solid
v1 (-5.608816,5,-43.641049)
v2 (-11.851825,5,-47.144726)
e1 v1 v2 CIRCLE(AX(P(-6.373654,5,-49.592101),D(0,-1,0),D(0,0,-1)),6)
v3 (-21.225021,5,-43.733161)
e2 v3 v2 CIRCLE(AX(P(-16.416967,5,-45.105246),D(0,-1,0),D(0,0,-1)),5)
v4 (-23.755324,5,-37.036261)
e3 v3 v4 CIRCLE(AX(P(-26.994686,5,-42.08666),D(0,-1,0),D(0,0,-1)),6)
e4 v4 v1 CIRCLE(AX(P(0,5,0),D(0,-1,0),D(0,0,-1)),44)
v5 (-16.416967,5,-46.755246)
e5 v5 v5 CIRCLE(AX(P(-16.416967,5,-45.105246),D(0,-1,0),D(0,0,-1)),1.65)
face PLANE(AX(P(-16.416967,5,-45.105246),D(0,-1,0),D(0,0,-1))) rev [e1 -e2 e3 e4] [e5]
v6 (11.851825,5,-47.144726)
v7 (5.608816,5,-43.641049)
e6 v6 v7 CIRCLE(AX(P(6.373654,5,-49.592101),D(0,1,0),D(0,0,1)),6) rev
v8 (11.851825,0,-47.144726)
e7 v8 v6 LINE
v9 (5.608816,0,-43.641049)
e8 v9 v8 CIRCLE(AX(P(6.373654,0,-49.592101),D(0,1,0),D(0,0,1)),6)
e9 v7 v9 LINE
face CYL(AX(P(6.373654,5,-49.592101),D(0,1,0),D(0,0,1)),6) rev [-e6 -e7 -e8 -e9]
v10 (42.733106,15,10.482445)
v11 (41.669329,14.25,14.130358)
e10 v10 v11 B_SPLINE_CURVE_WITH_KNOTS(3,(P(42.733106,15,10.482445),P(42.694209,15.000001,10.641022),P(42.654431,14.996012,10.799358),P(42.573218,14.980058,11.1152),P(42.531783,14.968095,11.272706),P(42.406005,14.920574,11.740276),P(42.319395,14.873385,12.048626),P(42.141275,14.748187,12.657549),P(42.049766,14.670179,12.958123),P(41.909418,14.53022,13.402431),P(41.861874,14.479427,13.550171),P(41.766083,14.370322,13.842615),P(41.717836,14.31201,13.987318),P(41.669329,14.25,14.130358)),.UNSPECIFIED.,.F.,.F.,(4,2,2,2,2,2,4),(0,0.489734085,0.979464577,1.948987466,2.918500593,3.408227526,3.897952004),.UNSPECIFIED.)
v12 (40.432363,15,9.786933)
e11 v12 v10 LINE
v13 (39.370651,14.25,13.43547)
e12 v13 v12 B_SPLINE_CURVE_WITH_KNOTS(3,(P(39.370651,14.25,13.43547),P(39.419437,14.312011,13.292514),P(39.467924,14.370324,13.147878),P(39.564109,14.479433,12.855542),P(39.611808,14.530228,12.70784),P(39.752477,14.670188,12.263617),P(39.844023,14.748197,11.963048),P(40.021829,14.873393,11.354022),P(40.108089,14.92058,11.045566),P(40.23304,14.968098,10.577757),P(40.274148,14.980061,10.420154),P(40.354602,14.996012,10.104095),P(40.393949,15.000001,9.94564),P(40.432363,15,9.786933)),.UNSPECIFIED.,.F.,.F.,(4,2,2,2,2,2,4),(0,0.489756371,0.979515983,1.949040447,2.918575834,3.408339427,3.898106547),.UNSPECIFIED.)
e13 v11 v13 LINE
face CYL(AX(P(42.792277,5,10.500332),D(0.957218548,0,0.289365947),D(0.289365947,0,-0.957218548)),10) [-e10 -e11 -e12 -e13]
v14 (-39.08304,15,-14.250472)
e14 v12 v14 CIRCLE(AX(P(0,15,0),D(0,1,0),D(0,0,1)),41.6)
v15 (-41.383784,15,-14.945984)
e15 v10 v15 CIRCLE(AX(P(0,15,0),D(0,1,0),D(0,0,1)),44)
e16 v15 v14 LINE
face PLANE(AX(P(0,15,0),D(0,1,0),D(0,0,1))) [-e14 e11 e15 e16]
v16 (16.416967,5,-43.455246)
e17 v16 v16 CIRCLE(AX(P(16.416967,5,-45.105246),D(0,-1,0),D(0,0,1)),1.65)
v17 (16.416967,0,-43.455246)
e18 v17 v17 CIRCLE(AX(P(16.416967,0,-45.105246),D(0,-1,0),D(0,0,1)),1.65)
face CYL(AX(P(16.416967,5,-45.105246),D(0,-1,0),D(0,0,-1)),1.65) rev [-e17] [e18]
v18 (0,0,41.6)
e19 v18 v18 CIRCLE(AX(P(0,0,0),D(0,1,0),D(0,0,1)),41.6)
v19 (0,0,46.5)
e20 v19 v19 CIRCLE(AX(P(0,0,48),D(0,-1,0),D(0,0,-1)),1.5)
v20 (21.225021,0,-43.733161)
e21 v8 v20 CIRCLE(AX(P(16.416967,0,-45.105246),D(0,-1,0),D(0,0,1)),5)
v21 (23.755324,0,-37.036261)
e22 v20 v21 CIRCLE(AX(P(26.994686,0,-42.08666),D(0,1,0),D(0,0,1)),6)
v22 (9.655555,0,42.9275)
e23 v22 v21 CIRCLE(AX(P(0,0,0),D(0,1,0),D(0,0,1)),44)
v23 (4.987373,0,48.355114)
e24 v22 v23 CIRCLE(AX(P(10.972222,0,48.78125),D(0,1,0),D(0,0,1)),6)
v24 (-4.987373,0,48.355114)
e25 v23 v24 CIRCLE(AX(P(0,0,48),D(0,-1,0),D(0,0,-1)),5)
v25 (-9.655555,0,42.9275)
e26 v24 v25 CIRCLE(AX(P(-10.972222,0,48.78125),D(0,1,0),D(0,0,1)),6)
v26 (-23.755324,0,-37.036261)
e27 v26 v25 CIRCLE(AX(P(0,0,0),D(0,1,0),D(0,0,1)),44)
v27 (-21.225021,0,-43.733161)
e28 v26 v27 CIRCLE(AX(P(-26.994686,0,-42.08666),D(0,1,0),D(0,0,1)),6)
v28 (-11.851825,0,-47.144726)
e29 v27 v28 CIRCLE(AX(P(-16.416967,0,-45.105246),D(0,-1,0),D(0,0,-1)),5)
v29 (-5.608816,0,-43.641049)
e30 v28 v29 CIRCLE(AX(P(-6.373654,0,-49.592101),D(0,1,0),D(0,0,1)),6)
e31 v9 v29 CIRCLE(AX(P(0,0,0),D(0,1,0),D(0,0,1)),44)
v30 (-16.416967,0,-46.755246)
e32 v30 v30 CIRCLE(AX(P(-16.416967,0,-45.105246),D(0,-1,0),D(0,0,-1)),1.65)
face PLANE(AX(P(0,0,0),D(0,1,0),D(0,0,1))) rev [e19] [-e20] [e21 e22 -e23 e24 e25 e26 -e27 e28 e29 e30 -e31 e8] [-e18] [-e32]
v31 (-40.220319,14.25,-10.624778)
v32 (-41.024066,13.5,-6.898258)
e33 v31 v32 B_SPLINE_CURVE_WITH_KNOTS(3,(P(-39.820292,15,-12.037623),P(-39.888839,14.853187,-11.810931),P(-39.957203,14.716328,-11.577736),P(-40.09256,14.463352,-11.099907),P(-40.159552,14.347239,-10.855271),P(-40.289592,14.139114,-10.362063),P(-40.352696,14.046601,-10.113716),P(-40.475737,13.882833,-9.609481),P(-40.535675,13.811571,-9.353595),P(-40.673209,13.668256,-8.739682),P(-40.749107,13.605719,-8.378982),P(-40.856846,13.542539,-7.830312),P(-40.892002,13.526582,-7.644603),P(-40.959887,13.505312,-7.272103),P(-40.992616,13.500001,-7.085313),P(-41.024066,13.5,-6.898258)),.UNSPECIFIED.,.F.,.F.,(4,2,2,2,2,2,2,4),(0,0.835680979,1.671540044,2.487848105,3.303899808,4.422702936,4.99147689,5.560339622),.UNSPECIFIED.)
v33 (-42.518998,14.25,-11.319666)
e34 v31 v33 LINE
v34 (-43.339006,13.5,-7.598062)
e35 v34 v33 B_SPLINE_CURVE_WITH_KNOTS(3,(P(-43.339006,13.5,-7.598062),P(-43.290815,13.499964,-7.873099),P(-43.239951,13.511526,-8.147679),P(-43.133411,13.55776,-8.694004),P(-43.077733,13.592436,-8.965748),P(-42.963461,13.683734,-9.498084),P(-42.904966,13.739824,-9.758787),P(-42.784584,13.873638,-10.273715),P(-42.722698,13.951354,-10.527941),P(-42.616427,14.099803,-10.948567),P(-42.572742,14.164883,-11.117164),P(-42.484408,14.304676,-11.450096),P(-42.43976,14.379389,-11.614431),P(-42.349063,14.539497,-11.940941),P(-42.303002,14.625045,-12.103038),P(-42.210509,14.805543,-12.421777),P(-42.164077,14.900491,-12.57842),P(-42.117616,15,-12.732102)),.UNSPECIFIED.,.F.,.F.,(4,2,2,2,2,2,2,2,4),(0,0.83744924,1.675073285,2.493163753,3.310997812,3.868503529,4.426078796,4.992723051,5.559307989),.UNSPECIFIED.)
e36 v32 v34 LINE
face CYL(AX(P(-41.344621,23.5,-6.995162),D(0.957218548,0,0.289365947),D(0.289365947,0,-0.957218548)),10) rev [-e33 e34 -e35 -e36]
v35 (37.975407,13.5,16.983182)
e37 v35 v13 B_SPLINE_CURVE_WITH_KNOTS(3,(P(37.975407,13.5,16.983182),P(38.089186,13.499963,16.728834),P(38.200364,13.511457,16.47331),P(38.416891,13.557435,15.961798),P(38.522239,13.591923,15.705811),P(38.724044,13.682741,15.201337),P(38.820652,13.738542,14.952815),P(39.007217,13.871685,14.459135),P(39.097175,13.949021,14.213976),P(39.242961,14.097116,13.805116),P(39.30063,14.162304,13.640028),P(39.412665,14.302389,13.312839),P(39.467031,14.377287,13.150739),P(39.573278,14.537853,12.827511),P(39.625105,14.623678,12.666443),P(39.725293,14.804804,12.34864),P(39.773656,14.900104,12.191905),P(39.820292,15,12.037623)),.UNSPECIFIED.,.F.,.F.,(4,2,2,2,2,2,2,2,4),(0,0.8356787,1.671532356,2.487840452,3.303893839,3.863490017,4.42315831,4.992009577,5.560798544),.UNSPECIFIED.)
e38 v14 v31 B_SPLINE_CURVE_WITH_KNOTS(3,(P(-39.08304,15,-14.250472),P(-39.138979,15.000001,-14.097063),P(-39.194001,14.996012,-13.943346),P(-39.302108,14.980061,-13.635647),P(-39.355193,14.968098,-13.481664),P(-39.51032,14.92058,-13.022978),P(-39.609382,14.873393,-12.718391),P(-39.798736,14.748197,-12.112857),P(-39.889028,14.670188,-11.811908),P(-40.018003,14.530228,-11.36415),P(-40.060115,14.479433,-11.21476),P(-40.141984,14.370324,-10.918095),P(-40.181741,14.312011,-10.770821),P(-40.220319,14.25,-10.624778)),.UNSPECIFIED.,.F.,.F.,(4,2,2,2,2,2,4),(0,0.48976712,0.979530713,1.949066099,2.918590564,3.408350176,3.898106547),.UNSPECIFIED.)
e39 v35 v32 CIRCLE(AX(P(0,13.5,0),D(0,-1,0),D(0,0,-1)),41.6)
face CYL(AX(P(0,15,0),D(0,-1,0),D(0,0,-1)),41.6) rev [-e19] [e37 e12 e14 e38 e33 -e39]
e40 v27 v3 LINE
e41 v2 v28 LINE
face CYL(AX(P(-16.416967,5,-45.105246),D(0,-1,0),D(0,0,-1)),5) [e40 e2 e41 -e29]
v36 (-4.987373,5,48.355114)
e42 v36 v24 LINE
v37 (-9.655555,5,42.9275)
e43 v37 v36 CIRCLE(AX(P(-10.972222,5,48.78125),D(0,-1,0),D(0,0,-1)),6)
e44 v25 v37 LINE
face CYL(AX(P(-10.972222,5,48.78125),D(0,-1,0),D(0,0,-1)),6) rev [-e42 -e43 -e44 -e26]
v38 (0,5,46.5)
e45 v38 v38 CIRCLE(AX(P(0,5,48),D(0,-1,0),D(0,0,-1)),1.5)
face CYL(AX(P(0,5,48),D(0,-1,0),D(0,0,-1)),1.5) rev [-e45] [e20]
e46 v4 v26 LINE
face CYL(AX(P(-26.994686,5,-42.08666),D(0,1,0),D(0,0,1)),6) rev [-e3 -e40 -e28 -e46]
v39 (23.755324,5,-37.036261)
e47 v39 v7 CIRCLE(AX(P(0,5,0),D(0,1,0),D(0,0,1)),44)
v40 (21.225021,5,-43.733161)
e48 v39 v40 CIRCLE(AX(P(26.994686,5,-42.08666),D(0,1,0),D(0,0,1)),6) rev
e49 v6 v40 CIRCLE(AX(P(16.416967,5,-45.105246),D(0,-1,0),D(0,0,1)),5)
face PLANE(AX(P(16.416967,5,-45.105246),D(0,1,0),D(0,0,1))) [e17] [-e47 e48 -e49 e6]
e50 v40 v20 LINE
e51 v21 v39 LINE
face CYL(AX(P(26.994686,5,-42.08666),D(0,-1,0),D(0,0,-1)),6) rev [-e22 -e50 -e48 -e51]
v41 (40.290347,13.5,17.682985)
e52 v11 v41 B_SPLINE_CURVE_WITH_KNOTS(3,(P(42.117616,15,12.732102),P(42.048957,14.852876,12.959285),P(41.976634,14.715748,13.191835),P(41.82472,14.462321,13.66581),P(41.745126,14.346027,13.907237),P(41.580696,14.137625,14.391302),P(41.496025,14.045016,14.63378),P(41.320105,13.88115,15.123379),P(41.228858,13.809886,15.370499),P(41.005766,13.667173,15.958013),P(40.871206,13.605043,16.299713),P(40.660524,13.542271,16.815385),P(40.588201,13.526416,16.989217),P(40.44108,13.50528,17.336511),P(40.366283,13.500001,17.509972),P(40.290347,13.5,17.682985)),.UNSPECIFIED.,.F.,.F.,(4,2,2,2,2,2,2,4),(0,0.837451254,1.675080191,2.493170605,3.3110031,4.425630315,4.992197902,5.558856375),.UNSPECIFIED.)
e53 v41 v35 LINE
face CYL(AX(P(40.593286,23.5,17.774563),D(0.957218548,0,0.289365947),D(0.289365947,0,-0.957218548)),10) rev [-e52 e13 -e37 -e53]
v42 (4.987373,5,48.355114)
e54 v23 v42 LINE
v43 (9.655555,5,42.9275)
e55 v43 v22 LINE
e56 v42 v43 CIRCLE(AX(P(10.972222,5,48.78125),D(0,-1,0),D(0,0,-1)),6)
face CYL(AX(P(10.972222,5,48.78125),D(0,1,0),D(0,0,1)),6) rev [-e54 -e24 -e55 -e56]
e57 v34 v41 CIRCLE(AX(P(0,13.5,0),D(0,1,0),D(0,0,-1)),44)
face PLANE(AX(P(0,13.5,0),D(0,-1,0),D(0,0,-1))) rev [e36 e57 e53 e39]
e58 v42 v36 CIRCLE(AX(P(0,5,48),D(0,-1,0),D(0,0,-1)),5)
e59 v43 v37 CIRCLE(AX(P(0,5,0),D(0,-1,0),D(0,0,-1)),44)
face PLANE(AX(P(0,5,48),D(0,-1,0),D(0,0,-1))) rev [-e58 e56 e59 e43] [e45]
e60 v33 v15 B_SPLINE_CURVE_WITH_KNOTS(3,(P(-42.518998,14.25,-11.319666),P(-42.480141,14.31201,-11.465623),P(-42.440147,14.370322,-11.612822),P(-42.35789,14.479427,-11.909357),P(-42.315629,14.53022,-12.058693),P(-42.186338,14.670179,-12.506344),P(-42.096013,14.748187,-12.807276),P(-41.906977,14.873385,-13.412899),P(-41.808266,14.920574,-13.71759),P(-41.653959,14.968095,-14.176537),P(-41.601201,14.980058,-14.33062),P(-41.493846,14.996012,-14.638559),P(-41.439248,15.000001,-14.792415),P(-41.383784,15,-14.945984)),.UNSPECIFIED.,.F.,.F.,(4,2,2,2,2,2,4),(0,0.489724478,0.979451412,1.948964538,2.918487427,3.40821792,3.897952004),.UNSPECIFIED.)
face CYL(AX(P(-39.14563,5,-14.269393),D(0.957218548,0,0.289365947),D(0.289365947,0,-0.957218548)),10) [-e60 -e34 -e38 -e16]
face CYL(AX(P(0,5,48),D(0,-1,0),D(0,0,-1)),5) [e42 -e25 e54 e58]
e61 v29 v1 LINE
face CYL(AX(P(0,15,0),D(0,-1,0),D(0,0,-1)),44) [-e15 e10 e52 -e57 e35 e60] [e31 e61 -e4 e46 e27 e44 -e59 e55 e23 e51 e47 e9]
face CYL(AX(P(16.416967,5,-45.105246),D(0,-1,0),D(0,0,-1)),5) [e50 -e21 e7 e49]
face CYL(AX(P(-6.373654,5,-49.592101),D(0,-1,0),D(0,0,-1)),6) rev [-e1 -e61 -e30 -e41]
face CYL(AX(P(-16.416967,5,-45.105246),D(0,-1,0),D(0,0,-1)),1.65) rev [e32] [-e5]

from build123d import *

# Parameters (mm, degrees)
SKETCH_1_R          = 44
SKETCH_1_R_2        = 41.6
EXTRUDE_1_DEPTH     = 15
SKETCH_2_R          = 5
SKETCH_2_R_2        = 1.5
SKETCH_2_R_3        = 1.65
EXTRUDE_2_DEPTH     = 5
FILLET_1_R          = 6
CUT_EXTRUDE_START   = -1.5
CUT_EXTRUDE_1_DEPTH = 1.5
FILLET_2_R          = 10
FILLET_START        = -45
FILLET_3_DEPTH      = 90


with BuildPart() as part:
    # 草图1 → 凸台-拉伸1 (new body)
    with BuildSketch(Plane(origin=(0, 0, 0), x_dir=(1, 0, 0), z_dir=(0, 1, 0))):
        with Locations(Location((0, 0, 0), (0, 0, 270))):
            Circle(SKETCH_1_R)
        with Locations(Location((0, 0, 0), (0, 0, 270))):
            Circle(SKETCH_1_R_2, mode=Mode.SUBTRACT)
    extrude(amount=EXTRUDE_1_DEPTH)

    # 草图2 → 凸台-拉伸2 (add)
    # profile 1 of 3: a face of its own
    with BuildSketch(Plane.XZ):
        with Locations((0, 48)):
            Circle(SKETCH_2_R)
        with Locations(Location((0, 48, 0), (0, 0, 270))):
            Circle(SKETCH_2_R_2, mode=Mode.SUBTRACT)
    # profile 2 of 3: a face of its own
    with BuildSketch(Plane.XZ):
        with Locations((-16.41696688, -45.105245798)):
            Circle(SKETCH_2_R)
        with Locations(Location((-16.41696688, -45.105245798, 0), (0, 0, 270))):
            Circle(SKETCH_2_R_3, mode=Mode.SUBTRACT)
    # profile 3 of 3: a face of its own
    with BuildSketch(Plane.XZ):
        with Locations((16.41696688, -45.105245798)):
            Circle(SKETCH_2_R)
        with Locations(Location((16.41696688, -45.105245798, 0), (0, 0, 90))):
            Circle(SKETCH_2_R_3, mode=Mode.SUBTRACT)
    extrude(amount=-EXTRUDE_2_DEPTH)

    # 圆角1
    fillet_1_edges = [part.edges().sort_by_distance(p)[0] for p in [
        (2.870750936, 2.5, 43.90625),
        (-2.870750936, 2.5, 43.90625),
        (-17.714445389, 2.5, -40.276524485),
        (-12.319198447, 2.5, -42.240233778),
        (12.319198447, 2.5, -42.240233778),
        (17.714445389, 2.5, -40.276524485),
    ]]
    fillet(fillet_1_edges, radius=FILLET_1_R)

    # 草图3 → 切除-拉伸1 (cut)
    with BuildSketch(Plane(origin=(0, 15, 0), x_dir=(1, 0, 0), z_dir=(0, 1, 0)).offset(CUT_EXTRUDE_START)):
        with BuildLine():
            Line((42.117616116, -12.732101662), (39.8202916, -12.03762339))
            ThreePointArc((39.8202916, -12.03762339), (-12.03762339, -39.8202916), (-39.8202916, 12.03762339))
            Line((-39.8202916, 12.03762339), (-42.117616116, 12.732101662))
            ThreePointArc((-42.117616116, 12.732101662), (-12.732101662, -42.117616116), (42.117616116, -12.732101662))
        make_face()
    extrude(amount=CUT_EXTRUDE_1_DEPTH, mode=Mode.SUBTRACT)

    # 圆角2
    # the kernel refuses this fillet: 10 mm, written as the material it adds along each edge
    with BuildSketch(Plane(origin=(-27.214137615, 13.5, -8.22679911), x_dir=(-0.28936594687336814, 0, 0.9572185480808858), z_dir=(-0.9572185480808859, 0, -0.28936594687336814))) as fillet_2_piece_1_section:
        with BuildLine():
            CenterArc((5.267826876, 10), FILLET_2_R, 238.211669383, 31.788330617)
            Line((0, 1.5), (-0.105356538, 1.33))
            ThreePointArc((-0.105356538, 1.33), (-0.2, 0.75), (-0.2, 0))
            Line((-0.2, 0), (0, -0.2))
            Line((0, -0.2), (5.267826876, -0.2))
            Line((5.267826876, -0.2), (5.267826876, 0))
        make_face()
    fillet_2_piece_1 = extrude(amount=28.739134382, mode=Mode.PRIVATE)
    fillet_2_piece_1 = fillet_2_piece_1 & Plane(origin=(0, 13.5, 0), x_dir=(0, 0, 1), z_dir=(0, -1, 0)) * Cylinder(44, 79, mode=Mode.PRIVATE)
    fillet_2_piece_1 = fillet_2_piece_1 - Plane(origin=(0, 13.5, 0), x_dir=(0, 0, 1), z_dir=(0, -1, 0)) * Cylinder(41.6, 79, mode=Mode.PRIVATE)
    add(fillet_2_piece_1)
    with BuildSketch(Plane(origin=(54.723770101, 13.5, 16.542925943), x_dir=(-0.2893659468733635, 0, 0.9572185480808872), z_dir=(-0.9572185480808872, 0, -0.2893659468733635))) as fillet_2_piece_2_section:
        with BuildLine():
            CenterArc((5.267826876, 10), FILLET_2_R, 238.211669383, 31.788330617)
            Line((0, 1.5), (-0.105356538, 1.33))
            ThreePointArc((-0.105356538, 1.33), (-0.2, 0.75), (-0.2, 0))
            Line((-0.2, 0), (0, -0.2))
            Line((0, -0.2), (5.267826876, -0.2))
            Line((5.267826876, -0.2), (5.267826876, 0))
        make_face()
    fillet_2_piece_2 = extrude(amount=28.739134382, mode=Mode.PRIVATE)
    fillet_2_piece_2 = fillet_2_piece_2 & Plane(origin=(0, 13.5, 0), x_dir=(0, 0, 1), z_dir=(0, -1, 0)) * Cylinder(44, 79, mode=Mode.PRIVATE)
    fillet_2_piece_2 = fillet_2_piece_2 - Plane(origin=(0, 13.5, 0), x_dir=(0, 0, 1), z_dir=(0, -1, 0)) * Cylinder(41.6, 79, mode=Mode.PRIVATE)
    add(fillet_2_piece_2)

    # 圆角3: read off the stored shape, not the designer's step
    # 圆角3 outline → 圆角3 (cut)
    with BuildSketch(Plane(origin=(0, 0, 0), x_dir=(0, 1, 0), z_dir=(0.9572185480808874, 0, 0.2893659468733631)).offset(FILLET_START)):
        with BuildLine():
            ThreePointArc((14.25, 1.468155838), (14.810708435, -0.395023527), (15, -2.3315152))
            Line((15, -2.3315152), (15, 0))
            ThreePointArc((15, 0), (14.594692852, 0.718595666), (14.25, 1.468155838))
        make_face()
    extrude(amount=FILLET_3_DEPTH, mode=Mode.SUBTRACT)


solid = part.part
